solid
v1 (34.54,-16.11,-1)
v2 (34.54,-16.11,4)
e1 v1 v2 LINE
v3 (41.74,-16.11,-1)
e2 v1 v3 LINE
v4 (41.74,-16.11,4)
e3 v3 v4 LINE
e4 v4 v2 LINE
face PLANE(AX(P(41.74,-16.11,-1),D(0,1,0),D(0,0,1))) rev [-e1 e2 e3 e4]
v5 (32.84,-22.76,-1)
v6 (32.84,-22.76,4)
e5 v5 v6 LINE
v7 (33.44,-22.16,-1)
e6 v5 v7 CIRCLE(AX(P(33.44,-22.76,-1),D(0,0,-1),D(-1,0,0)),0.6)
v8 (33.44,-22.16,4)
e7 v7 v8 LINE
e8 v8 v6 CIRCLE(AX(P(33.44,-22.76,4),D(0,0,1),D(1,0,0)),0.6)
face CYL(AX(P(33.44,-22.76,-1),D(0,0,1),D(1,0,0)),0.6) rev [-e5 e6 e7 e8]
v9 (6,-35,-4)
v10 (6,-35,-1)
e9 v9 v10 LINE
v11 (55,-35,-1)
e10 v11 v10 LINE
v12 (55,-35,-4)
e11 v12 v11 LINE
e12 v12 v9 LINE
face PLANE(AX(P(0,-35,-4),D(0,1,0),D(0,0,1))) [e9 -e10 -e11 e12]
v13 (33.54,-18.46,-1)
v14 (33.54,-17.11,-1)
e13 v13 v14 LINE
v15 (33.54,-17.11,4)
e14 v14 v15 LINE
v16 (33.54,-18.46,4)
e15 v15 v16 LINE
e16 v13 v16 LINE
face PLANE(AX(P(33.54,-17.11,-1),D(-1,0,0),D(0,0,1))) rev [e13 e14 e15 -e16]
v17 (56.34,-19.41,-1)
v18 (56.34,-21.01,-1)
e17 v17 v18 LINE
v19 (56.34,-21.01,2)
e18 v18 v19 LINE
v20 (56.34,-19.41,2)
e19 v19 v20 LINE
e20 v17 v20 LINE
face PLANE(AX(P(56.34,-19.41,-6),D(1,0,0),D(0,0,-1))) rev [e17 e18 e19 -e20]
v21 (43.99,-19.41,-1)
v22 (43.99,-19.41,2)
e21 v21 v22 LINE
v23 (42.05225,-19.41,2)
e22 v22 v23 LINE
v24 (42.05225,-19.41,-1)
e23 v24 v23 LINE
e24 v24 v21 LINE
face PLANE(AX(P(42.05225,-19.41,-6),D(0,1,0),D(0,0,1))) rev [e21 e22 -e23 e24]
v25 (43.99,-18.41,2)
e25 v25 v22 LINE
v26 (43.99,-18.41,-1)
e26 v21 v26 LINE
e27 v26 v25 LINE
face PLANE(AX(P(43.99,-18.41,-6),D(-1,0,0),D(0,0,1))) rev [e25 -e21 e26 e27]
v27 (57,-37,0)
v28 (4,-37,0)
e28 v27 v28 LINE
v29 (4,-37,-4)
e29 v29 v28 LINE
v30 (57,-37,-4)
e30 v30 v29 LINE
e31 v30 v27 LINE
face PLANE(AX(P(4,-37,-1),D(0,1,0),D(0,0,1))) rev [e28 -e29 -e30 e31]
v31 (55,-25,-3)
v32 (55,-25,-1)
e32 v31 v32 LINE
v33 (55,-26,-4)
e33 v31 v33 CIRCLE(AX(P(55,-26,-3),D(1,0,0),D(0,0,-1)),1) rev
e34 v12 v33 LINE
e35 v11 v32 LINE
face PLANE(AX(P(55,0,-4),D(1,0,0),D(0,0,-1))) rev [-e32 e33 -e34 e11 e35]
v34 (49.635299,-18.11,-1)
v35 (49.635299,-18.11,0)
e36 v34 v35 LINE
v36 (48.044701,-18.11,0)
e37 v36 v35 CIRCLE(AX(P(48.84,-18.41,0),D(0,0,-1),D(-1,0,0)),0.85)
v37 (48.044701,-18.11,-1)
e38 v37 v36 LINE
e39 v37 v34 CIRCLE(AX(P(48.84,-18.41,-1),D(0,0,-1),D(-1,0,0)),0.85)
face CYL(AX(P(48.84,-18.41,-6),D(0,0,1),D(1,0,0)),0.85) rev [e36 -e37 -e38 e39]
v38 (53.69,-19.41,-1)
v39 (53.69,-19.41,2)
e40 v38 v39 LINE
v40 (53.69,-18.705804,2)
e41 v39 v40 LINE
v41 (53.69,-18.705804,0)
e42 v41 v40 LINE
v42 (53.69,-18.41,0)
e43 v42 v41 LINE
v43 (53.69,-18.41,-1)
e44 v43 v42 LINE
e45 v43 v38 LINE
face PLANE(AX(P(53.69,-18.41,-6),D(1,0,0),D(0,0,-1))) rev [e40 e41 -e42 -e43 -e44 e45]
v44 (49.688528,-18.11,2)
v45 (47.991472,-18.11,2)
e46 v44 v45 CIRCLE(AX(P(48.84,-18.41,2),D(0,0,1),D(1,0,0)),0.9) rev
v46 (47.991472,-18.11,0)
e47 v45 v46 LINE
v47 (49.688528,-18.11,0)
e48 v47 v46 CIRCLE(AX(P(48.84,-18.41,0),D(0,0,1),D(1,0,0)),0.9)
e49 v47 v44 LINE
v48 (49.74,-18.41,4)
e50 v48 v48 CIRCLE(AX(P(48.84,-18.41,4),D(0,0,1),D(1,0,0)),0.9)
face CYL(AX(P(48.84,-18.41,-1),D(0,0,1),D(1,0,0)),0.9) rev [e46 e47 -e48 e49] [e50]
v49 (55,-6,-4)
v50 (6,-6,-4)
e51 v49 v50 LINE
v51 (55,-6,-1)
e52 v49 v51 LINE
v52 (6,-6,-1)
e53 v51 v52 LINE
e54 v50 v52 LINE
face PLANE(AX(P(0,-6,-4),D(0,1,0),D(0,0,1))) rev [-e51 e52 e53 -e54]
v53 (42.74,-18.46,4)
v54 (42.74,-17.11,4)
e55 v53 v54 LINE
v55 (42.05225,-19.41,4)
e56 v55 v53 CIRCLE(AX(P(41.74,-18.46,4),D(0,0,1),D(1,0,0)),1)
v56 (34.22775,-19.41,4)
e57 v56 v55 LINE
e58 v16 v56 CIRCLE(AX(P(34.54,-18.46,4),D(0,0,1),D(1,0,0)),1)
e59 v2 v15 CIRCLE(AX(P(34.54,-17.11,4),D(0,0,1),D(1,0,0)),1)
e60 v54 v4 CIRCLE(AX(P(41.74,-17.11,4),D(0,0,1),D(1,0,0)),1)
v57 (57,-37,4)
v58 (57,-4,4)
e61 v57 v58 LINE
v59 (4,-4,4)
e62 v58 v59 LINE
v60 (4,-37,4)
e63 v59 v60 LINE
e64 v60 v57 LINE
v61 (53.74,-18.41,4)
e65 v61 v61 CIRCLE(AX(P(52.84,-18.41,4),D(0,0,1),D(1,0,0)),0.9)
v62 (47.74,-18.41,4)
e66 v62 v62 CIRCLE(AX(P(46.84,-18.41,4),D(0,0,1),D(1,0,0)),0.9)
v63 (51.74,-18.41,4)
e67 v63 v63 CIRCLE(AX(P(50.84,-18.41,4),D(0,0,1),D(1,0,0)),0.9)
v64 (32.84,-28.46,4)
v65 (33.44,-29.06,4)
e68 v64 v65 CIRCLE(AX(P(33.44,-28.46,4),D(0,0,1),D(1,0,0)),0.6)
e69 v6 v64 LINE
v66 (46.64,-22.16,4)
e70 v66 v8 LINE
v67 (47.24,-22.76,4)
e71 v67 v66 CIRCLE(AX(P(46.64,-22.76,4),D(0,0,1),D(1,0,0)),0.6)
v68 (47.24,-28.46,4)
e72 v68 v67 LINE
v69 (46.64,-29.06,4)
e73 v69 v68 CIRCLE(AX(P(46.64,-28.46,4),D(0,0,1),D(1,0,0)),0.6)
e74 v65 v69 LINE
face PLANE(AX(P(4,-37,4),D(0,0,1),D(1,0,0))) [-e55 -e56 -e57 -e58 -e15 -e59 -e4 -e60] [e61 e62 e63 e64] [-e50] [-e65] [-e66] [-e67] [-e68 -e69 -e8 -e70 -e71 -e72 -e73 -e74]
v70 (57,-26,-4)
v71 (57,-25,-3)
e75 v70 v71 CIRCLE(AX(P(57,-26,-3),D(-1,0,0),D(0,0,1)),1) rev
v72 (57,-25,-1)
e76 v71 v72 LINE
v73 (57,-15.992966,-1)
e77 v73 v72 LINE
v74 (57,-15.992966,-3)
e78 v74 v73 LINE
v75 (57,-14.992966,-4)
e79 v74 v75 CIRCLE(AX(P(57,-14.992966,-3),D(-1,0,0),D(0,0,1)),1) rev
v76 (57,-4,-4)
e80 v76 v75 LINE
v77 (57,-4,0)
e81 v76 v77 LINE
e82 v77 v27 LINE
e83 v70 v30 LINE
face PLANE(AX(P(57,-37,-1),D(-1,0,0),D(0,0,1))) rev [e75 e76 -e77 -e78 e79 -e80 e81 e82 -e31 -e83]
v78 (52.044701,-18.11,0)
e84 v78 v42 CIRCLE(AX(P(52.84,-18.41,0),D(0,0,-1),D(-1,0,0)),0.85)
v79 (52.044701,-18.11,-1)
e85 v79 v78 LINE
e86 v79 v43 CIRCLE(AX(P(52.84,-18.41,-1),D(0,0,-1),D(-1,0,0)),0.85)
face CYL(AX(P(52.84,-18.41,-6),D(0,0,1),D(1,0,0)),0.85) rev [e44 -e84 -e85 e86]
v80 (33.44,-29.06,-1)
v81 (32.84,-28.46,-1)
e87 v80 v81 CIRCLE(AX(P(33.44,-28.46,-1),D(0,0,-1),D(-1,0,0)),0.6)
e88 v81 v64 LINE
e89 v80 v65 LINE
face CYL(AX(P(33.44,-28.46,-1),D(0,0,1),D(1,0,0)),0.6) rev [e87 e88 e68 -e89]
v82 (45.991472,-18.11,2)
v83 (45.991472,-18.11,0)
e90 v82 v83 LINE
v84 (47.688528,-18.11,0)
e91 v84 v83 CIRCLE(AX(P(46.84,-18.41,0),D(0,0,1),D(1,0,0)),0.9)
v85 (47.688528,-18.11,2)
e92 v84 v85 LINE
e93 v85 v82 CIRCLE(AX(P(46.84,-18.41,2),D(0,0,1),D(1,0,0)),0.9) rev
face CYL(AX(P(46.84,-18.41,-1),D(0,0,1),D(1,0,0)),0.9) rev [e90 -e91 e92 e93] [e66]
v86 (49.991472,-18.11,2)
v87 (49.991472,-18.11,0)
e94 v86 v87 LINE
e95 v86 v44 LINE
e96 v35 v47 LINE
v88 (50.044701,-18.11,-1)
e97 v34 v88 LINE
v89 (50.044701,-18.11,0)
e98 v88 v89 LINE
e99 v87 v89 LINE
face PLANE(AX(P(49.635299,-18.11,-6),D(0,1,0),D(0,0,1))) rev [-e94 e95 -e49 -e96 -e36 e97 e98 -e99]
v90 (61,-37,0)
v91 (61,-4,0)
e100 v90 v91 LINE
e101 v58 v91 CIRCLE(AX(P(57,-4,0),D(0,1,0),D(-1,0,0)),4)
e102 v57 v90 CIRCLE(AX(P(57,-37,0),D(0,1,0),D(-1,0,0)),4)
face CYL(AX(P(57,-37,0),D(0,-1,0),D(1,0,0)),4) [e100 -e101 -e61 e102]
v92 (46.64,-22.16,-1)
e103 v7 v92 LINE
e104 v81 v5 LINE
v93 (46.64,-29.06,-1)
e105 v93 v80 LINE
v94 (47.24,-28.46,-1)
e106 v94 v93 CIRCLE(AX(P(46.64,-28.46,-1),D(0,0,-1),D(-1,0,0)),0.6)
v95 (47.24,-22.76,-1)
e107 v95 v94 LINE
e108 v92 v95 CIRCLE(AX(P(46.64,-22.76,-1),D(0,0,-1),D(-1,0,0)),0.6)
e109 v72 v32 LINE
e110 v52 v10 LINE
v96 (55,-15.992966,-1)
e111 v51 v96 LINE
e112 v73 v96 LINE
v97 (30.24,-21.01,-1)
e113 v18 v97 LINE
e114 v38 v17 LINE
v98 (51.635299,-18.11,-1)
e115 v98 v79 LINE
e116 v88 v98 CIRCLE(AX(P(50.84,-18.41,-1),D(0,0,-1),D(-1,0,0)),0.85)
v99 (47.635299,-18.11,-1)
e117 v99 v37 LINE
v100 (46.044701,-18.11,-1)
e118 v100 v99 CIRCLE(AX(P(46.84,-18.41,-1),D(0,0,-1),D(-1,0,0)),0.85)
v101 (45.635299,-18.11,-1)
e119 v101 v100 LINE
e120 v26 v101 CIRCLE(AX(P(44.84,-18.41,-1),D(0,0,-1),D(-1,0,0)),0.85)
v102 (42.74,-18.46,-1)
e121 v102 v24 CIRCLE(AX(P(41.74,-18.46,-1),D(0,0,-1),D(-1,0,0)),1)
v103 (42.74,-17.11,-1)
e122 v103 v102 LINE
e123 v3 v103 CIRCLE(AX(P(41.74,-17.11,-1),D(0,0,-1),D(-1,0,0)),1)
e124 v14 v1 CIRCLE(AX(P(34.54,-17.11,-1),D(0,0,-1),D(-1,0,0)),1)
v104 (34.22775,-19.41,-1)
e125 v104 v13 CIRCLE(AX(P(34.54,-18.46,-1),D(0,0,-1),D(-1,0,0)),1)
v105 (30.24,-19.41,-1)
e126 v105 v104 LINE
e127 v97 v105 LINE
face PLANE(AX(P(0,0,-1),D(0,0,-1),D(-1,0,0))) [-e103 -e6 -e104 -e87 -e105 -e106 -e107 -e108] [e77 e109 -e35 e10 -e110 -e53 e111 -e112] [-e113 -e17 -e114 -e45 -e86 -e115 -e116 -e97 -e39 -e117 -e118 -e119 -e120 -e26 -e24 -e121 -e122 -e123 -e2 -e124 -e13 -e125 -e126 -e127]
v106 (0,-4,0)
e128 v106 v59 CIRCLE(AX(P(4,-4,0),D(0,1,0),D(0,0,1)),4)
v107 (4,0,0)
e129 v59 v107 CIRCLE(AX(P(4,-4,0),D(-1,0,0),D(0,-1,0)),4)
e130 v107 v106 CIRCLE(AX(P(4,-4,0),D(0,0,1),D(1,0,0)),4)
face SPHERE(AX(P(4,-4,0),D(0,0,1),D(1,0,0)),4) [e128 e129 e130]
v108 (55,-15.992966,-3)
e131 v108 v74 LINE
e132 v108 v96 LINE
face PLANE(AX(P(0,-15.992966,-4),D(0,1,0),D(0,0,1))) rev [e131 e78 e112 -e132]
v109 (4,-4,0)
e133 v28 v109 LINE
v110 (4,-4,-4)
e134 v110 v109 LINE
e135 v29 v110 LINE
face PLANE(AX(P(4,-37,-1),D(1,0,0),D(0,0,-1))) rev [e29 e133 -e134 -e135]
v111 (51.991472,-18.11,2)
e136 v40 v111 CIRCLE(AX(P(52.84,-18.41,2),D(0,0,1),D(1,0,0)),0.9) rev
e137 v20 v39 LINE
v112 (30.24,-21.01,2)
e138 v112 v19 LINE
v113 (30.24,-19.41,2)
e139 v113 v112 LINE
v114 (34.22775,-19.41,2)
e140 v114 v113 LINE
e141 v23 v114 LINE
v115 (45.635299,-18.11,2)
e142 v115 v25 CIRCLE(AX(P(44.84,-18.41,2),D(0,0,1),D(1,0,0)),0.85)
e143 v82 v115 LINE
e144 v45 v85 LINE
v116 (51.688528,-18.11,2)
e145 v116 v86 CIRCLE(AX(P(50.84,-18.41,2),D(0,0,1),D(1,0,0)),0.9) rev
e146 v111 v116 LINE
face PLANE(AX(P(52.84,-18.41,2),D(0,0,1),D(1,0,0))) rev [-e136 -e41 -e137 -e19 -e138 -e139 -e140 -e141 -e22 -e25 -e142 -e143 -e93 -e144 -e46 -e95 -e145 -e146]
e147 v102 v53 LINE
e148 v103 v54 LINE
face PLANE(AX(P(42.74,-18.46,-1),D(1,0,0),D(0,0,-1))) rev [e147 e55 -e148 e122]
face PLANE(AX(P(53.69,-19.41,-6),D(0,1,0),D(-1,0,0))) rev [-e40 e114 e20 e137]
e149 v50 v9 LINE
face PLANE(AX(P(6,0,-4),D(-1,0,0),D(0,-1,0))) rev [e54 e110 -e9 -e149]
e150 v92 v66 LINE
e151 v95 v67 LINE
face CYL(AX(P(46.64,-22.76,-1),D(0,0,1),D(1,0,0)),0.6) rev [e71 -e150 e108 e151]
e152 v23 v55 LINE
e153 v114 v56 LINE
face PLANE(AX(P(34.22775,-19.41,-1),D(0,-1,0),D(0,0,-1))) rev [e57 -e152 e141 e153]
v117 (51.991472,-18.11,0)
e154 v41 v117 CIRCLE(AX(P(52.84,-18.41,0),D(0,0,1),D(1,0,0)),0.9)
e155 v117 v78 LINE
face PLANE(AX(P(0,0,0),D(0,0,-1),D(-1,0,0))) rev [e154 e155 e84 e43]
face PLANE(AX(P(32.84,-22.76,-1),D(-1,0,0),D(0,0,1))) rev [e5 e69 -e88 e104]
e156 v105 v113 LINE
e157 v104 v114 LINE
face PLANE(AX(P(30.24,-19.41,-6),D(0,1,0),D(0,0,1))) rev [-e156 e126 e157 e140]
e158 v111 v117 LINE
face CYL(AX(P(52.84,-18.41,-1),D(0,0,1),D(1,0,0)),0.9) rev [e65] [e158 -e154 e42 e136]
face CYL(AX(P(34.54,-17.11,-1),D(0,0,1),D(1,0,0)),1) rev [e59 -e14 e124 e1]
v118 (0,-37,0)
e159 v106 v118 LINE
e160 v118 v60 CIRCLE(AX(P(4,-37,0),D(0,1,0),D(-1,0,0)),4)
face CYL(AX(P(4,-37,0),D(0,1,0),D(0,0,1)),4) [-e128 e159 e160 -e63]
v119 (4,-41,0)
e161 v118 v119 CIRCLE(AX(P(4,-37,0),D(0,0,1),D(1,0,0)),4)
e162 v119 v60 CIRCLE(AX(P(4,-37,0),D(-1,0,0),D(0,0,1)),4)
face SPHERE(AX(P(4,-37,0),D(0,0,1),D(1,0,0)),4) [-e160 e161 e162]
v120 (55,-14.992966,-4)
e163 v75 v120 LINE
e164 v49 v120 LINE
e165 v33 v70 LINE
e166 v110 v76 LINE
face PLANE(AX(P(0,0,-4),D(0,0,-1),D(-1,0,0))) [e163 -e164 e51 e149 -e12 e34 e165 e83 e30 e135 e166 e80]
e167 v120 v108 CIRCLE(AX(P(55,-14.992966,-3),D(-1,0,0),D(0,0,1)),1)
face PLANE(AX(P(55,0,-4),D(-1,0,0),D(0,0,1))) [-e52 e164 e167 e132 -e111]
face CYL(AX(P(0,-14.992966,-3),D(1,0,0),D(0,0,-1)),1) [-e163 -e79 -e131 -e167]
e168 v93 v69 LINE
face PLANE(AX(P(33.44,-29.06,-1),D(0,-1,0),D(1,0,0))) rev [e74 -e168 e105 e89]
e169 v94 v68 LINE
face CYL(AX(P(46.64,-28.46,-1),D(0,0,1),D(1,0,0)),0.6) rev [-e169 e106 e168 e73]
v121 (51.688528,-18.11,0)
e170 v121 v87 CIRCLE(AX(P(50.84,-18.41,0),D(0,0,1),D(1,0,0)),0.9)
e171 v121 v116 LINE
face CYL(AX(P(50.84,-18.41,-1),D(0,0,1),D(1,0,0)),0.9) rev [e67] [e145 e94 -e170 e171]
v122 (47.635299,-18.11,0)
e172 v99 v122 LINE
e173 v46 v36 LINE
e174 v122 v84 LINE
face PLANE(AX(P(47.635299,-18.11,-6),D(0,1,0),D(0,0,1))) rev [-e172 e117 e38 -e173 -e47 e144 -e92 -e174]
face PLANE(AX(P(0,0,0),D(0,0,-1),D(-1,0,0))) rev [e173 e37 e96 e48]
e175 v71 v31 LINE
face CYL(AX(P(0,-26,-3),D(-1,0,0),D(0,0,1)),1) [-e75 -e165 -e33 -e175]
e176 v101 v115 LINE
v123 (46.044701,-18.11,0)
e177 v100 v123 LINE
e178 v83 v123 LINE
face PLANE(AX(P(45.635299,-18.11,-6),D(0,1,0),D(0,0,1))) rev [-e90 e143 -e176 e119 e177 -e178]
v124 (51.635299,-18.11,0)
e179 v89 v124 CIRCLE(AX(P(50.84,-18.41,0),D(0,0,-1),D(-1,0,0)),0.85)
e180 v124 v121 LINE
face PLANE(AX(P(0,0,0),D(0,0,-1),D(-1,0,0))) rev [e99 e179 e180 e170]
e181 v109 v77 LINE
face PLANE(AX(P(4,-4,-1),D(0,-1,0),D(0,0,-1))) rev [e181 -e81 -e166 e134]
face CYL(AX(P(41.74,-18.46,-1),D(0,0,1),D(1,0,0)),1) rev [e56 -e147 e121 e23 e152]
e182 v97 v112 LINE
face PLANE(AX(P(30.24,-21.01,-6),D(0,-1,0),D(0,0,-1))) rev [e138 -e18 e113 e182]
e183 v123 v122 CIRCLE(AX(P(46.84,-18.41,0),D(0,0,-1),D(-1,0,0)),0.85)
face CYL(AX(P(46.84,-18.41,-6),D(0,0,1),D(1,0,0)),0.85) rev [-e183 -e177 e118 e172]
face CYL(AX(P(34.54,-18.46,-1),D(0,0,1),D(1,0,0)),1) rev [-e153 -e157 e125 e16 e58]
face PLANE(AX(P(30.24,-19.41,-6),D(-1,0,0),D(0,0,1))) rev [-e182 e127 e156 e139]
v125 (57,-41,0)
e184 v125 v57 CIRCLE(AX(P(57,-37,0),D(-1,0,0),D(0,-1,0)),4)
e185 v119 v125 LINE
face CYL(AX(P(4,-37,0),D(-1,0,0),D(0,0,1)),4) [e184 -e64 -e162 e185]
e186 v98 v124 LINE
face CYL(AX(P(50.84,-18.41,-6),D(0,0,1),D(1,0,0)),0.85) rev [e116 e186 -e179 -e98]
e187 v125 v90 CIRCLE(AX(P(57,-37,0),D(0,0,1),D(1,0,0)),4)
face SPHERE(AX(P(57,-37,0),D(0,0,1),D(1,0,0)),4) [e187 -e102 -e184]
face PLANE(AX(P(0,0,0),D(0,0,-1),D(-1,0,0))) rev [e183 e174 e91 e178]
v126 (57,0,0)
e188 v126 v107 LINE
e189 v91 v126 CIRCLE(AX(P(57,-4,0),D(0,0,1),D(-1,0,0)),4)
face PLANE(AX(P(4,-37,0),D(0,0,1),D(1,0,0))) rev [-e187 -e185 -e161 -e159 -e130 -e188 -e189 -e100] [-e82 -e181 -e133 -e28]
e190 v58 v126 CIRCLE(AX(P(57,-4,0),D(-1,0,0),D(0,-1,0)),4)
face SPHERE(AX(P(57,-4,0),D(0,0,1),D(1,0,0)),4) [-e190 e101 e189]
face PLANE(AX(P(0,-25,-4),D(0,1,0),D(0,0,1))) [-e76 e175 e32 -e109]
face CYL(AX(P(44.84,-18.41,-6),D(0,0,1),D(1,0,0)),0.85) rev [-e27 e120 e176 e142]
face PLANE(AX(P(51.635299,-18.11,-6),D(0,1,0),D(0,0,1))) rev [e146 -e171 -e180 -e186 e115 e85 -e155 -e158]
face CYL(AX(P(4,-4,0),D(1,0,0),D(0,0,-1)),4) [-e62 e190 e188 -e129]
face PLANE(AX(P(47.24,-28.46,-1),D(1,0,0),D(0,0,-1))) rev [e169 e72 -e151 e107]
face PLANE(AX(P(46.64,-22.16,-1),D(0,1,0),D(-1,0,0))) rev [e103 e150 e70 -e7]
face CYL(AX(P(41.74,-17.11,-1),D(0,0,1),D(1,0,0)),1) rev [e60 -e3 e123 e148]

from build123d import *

# Parameters (mm, degrees)
RESSALTO_EXTRUS_O1_DEPTH = 4
ESBO_O8_OUTSIDE_W        = 77.722
ESBO_O8_OUTSIDE_H        = 57.722
ESBO_O8_OUTSIDE_R        = 0.9
CORTE_EXTRUS_O8_DEPTH    = 5
FILETE4_R                = 4
ESBO_O11_W               = 53
ESBO_O11_H               = 33
RESSALTO_EXTRUS_O4_DEPTH = 1
CORTE_EXTRUS_O9_START    = -2
ESBO_O3_OUTSIDE_W        = 77.734
ESBO_O3_OUTSIDE_H        = 57.734
CORTE_EXTRUS_O9_DEPTH    = 8
RESSALTO_EXTRUS_O5_DEPTH = 3
FILETE5_R                = 1
FILETE6_R                = 1


with BuildPart() as part:
    # Esboço1 → Ressalto-extrusão1 (new body)
    with BuildSketch(Plane.XY):
        with BuildLine():
            Line((4, 0), (57, 0))
            ThreePointArc((57, 0), (59.828427125, -1.171572875), (61, -4))
            Line((61, -4), (61, -37))
            ThreePointArc((61, -37), (59.828427125, -39.828427125), (57, -41))
            Line((57, -41), (4, -41))
            ThreePointArc((4, -41), (1.171572875, -39.828427125), (0, -37))
            Line((0, -37), (0, -4))
            ThreePointArc((0, -4), (1.171572875, -1.171572875), (4, 0))
        make_face()
    extrude(amount=RESSALTO_EXTRUS_O1_DEPTH)

    # Esboço8 outside → Corte-extrusão8 (cut)
    # profile 1 of 7: a face of its own
    with BuildSketch(Plane.XY.offset(4)):
        with Locations((30.5, -20.5)):
            Rectangle(ESBO_O8_OUTSIDE_W, ESBO_O8_OUTSIDE_H)
        with BuildLine():
            Line((0, -4), (0, -37))
            ThreePointArc((0, -37), (1.171572875, -39.828427125), (4, -41))
            Line((4, -41), (57, -41))
            ThreePointArc((57, -41), (59.828427125, -39.828427125), (61, -37))
            Line((61, -37), (61, -4))
            ThreePointArc((61, -4), (59.828427125, -1.171572875), (57, 0))
            Line((57, 0), (4, 0))
            ThreePointArc((4, 0), (1.171572875, -1.171572875), (0, -4))
        make_face(mode=Mode.SUBTRACT)
    # profile 2 of 7: a face of its own
    with BuildSketch(Plane.XY.offset(4)):
        with Locations((46.84, -18.41)):
            Circle(ESBO_O8_OUTSIDE_R)
    # profile 3 of 7: a face of its own
    with BuildSketch(Plane.XY.offset(4)):
        with Locations((48.84, -18.41)):
            Circle(ESBO_O8_OUTSIDE_R)
    # profile 4 of 7: a face of its own
    with BuildSketch(Plane.XY.offset(4)):
        with Locations((50.84, -18.41)):
            Circle(ESBO_O8_OUTSIDE_R)
    # profile 5 of 7: a face of its own
    with BuildSketch(Plane.XY.offset(4)):
        with Locations((52.84, -18.41)):
            Circle(ESBO_O8_OUTSIDE_R)
    # profile 6 of 7: a face of its own
    with BuildSketch(Plane.XY.offset(4)):
        with BuildLine():
            Line((34.2277501, -19.41), (42.0522499, -19.41))
            ThreePointArc((42.0522499, -19.41), (42.550015401, -19.046408603), (42.74, -18.46))
            Line((42.74, -18.46), (42.74, -17.11))
            ThreePointArc((42.74, -17.11), (42.447106781, -16.402893219), (41.74, -16.11))
            Line((41.74, -16.11), (34.54, -16.11))
            ThreePointArc((34.54, -16.11), (33.832893219, -16.402893219), (33.54, -17.11))
            Line((33.54, -17.11), (33.54, -18.46))
            ThreePointArc((33.54, -18.46), (33.729984599, -19.046408603), (34.2277501, -19.41))
        make_face()
    # profile 7 of 7: a face of its own
    with BuildSketch(Plane.XY.offset(4)):
        with BuildLine():
            Line((32.84, -22.76), (32.84, -28.46))
            ThreePointArc((32.84, -28.46), (33.015735931, -28.884264069), (33.44, -29.06))
            Line((33.44, -29.06), (46.64, -29.06))
            ThreePointArc((46.64, -29.06), (47.064264069, -28.884264069), (47.24, -28.46))
            Line((47.24, -28.46), (47.24, -22.76))
            ThreePointArc((47.24, -22.76), (47.064264069, -22.335735931), (46.64, -22.16))
            Line((46.64, -22.16), (33.44, -22.16))
            ThreePointArc((33.44, -22.16), (33.015735931, -22.335735931), (32.84, -22.76))
        make_face()
    extrude(amount=-CORTE_EXTRUS_O8_DEPTH, mode=Mode.SUBTRACT)

    # Filete4
    filete4_edges = [part.edges().sort_by_distance(p)[0] for p in [
        (1.171572875, -1.171572875, 4),
        (0, -20.5, 4),
        (1.171572875, -39.828427125, 4),
        (30.5, -41, 4),
        (59.828427125, -39.828427125, 4),
        (61, -20.5, 4),
        (59.828427125, -1.171572875, 4),
        (30.5, 0, 4),
    ]]
    fillet(filete4_edges, radius=FILETE4_R - 0.0001)  # a hair under: the kernel refuses the full size

    # Esboço11 → Ressalto-extrusão4 (add)
    with BuildSketch(Plane(origin=(0, 0, 0), x_dir=(-1, 0, 0), z_dir=(0, 0, -1))):
        with Locations((-30.5, -20.5)):
            Rectangle(ESBO_O11_W, ESBO_O11_H)
    extrude(amount=RESSALTO_EXTRUS_O4_DEPTH)

    # Esboço3 outside → Corte-extrusão9 (cut)
    # profile 1 of 3: a face of its own
    with BuildSketch(Plane.XY.offset(4).offset(CORTE_EXTRUS_O9_START)):
        with Locations((30.5, -20.5)):
            Rectangle(ESBO_O3_OUTSIDE_W, ESBO_O3_OUTSIDE_H)
        with BuildLine():
            Line((0, -4), (0, -37))
            ThreePointArc((0, -37), (1.171572875, -39.828427125), (4, -41))
            Line((4, -41), (57, -41))
            ThreePointArc((57, -41), (59.828427125, -39.828427125), (61, -37))
            Line((61, -37), (61, -4))
            ThreePointArc((61, -4), (59.828427125, -1.171572875), (57, 0))
            Line((57, 0), (4, 0))
            ThreePointArc((4, 0), (1.171572875, -1.171572875), (0, -4))
        make_face(mode=Mode.SUBTRACT)
    # profile 2 of 3: a face of its own
    with BuildSketch(Plane.XY.offset(4).offset(CORTE_EXTRUS_O9_START)):
        with BuildLine():
            Line((53.69, -18.41), (53.69, -19.41))
            Line((53.69, -19.41), (56.34, -19.41))
            Line((56.34, -19.41), (56.34, -21.01))
            Line((56.34, -21.01), (30.24, -21.01))
            Line((30.24, -21.01), (30.24, -19.41))
            Line((30.24, -19.41), (34.2277501, -19.41))
            ThreePointArc((34.2277501, -19.41), (33.729984599, -19.046408603), (33.54, -18.46))
            Line((33.54, -18.46), (33.54, -17.11))
            ThreePointArc((33.54, -17.11), (33.832893219, -16.402893219), (34.54, -16.11))
            Line((34.54, -16.11), (41.74, -16.11))
            ThreePointArc((41.74, -16.11), (42.447106781, -16.402893219), (42.74, -17.11))
            Line((42.74, -17.11), (42.74, -18.46))
            ThreePointArc((42.74, -18.46), (42.550015401, -19.046408603), (42.0522499, -19.41))
            Line((42.0522499, -19.41), (43.99, -19.41))
            Line((43.99, -19.41), (43.99, -18.41))
            ThreePointArc((43.99, -18.41), (44.68752686, -17.573787143), (45.635298686, -18.11))
            Line((45.635298686, -18.11), (46.044701314, -18.11))
            ThreePointArc((46.044701314, -18.11), (46.84, -17.56), (47.635298686, -18.11))
            Line((47.635298686, -18.11), (48.044701314, -18.11))
            ThreePointArc((48.044701314, -18.11), (48.84, -17.56), (49.635298686, -18.11))
            Line((49.635298686, -18.11), (50.044701314, -18.11))
            ThreePointArc((50.044701314, -18.11), (50.84, -17.56), (51.635298686, -18.11))
            Line((51.635298686, -18.11), (52.044701314, -18.11))
            ThreePointArc((52.044701314, -18.11), (52.99247314, -17.573787143), (53.69, -18.41))
        make_face()
    # profile 3 of 3: a face of its own
    with BuildSketch(Plane.XY.offset(4).offset(CORTE_EXTRUS_O9_START)):
        with BuildLine():
            Line((33.44, -22.16), (46.64, -22.16))
            ThreePointArc((46.64, -22.16), (47.064264069, -22.335735931), (47.24, -22.76))
            Line((47.24, -22.76), (47.24, -28.46))
            ThreePointArc((47.24, -28.46), (47.064264069, -28.884264069), (46.64, -29.06))
            Line((46.64, -29.06), (33.44, -29.06))
            ThreePointArc((33.44, -29.06), (33.015735931, -28.884264069), (32.84, -28.46))
            Line((32.84, -28.46), (32.84, -22.76))
            ThreePointArc((32.84, -22.76), (33.015735931, -22.335735931), (33.44, -22.16))
        make_face()
    extrude(amount=-CORTE_EXTRUS_O9_DEPTH, mode=Mode.SUBTRACT)

    # Esboço13 → Ressalto-extrusão5 (add)
    with BuildSketch(Plane(origin=(0, 0, -1), x_dir=(-1, 0, 0), z_dir=(0, 0, -1))):
        Polygon((-57, -4), (-4, -4), (-4, -37), (-57, -37), (-57, -25), (-55, -25), (-55, -35), (-6, -35), (-6, -6), (-55, -6), (-55, -15.992966124), (-57, -15.992966124), align=None)
    extrude(amount=RESSALTO_EXTRUS_O5_DEPTH)

    # Filete5
    filete5_edges = [part.edges().sort_by_distance(p)[0] for p in [
        (56, -15.992966124, -4),
    ]]
    fillet(filete5_edges, radius=FILETE5_R)

    # Filete6
    filete6_edges = [part.edges().sort_by_distance(p)[0] for p in [
        (56, -25, -4),
    ]]
    fillet(filete6_edges, radius=FILETE6_R)


solid = part.part
